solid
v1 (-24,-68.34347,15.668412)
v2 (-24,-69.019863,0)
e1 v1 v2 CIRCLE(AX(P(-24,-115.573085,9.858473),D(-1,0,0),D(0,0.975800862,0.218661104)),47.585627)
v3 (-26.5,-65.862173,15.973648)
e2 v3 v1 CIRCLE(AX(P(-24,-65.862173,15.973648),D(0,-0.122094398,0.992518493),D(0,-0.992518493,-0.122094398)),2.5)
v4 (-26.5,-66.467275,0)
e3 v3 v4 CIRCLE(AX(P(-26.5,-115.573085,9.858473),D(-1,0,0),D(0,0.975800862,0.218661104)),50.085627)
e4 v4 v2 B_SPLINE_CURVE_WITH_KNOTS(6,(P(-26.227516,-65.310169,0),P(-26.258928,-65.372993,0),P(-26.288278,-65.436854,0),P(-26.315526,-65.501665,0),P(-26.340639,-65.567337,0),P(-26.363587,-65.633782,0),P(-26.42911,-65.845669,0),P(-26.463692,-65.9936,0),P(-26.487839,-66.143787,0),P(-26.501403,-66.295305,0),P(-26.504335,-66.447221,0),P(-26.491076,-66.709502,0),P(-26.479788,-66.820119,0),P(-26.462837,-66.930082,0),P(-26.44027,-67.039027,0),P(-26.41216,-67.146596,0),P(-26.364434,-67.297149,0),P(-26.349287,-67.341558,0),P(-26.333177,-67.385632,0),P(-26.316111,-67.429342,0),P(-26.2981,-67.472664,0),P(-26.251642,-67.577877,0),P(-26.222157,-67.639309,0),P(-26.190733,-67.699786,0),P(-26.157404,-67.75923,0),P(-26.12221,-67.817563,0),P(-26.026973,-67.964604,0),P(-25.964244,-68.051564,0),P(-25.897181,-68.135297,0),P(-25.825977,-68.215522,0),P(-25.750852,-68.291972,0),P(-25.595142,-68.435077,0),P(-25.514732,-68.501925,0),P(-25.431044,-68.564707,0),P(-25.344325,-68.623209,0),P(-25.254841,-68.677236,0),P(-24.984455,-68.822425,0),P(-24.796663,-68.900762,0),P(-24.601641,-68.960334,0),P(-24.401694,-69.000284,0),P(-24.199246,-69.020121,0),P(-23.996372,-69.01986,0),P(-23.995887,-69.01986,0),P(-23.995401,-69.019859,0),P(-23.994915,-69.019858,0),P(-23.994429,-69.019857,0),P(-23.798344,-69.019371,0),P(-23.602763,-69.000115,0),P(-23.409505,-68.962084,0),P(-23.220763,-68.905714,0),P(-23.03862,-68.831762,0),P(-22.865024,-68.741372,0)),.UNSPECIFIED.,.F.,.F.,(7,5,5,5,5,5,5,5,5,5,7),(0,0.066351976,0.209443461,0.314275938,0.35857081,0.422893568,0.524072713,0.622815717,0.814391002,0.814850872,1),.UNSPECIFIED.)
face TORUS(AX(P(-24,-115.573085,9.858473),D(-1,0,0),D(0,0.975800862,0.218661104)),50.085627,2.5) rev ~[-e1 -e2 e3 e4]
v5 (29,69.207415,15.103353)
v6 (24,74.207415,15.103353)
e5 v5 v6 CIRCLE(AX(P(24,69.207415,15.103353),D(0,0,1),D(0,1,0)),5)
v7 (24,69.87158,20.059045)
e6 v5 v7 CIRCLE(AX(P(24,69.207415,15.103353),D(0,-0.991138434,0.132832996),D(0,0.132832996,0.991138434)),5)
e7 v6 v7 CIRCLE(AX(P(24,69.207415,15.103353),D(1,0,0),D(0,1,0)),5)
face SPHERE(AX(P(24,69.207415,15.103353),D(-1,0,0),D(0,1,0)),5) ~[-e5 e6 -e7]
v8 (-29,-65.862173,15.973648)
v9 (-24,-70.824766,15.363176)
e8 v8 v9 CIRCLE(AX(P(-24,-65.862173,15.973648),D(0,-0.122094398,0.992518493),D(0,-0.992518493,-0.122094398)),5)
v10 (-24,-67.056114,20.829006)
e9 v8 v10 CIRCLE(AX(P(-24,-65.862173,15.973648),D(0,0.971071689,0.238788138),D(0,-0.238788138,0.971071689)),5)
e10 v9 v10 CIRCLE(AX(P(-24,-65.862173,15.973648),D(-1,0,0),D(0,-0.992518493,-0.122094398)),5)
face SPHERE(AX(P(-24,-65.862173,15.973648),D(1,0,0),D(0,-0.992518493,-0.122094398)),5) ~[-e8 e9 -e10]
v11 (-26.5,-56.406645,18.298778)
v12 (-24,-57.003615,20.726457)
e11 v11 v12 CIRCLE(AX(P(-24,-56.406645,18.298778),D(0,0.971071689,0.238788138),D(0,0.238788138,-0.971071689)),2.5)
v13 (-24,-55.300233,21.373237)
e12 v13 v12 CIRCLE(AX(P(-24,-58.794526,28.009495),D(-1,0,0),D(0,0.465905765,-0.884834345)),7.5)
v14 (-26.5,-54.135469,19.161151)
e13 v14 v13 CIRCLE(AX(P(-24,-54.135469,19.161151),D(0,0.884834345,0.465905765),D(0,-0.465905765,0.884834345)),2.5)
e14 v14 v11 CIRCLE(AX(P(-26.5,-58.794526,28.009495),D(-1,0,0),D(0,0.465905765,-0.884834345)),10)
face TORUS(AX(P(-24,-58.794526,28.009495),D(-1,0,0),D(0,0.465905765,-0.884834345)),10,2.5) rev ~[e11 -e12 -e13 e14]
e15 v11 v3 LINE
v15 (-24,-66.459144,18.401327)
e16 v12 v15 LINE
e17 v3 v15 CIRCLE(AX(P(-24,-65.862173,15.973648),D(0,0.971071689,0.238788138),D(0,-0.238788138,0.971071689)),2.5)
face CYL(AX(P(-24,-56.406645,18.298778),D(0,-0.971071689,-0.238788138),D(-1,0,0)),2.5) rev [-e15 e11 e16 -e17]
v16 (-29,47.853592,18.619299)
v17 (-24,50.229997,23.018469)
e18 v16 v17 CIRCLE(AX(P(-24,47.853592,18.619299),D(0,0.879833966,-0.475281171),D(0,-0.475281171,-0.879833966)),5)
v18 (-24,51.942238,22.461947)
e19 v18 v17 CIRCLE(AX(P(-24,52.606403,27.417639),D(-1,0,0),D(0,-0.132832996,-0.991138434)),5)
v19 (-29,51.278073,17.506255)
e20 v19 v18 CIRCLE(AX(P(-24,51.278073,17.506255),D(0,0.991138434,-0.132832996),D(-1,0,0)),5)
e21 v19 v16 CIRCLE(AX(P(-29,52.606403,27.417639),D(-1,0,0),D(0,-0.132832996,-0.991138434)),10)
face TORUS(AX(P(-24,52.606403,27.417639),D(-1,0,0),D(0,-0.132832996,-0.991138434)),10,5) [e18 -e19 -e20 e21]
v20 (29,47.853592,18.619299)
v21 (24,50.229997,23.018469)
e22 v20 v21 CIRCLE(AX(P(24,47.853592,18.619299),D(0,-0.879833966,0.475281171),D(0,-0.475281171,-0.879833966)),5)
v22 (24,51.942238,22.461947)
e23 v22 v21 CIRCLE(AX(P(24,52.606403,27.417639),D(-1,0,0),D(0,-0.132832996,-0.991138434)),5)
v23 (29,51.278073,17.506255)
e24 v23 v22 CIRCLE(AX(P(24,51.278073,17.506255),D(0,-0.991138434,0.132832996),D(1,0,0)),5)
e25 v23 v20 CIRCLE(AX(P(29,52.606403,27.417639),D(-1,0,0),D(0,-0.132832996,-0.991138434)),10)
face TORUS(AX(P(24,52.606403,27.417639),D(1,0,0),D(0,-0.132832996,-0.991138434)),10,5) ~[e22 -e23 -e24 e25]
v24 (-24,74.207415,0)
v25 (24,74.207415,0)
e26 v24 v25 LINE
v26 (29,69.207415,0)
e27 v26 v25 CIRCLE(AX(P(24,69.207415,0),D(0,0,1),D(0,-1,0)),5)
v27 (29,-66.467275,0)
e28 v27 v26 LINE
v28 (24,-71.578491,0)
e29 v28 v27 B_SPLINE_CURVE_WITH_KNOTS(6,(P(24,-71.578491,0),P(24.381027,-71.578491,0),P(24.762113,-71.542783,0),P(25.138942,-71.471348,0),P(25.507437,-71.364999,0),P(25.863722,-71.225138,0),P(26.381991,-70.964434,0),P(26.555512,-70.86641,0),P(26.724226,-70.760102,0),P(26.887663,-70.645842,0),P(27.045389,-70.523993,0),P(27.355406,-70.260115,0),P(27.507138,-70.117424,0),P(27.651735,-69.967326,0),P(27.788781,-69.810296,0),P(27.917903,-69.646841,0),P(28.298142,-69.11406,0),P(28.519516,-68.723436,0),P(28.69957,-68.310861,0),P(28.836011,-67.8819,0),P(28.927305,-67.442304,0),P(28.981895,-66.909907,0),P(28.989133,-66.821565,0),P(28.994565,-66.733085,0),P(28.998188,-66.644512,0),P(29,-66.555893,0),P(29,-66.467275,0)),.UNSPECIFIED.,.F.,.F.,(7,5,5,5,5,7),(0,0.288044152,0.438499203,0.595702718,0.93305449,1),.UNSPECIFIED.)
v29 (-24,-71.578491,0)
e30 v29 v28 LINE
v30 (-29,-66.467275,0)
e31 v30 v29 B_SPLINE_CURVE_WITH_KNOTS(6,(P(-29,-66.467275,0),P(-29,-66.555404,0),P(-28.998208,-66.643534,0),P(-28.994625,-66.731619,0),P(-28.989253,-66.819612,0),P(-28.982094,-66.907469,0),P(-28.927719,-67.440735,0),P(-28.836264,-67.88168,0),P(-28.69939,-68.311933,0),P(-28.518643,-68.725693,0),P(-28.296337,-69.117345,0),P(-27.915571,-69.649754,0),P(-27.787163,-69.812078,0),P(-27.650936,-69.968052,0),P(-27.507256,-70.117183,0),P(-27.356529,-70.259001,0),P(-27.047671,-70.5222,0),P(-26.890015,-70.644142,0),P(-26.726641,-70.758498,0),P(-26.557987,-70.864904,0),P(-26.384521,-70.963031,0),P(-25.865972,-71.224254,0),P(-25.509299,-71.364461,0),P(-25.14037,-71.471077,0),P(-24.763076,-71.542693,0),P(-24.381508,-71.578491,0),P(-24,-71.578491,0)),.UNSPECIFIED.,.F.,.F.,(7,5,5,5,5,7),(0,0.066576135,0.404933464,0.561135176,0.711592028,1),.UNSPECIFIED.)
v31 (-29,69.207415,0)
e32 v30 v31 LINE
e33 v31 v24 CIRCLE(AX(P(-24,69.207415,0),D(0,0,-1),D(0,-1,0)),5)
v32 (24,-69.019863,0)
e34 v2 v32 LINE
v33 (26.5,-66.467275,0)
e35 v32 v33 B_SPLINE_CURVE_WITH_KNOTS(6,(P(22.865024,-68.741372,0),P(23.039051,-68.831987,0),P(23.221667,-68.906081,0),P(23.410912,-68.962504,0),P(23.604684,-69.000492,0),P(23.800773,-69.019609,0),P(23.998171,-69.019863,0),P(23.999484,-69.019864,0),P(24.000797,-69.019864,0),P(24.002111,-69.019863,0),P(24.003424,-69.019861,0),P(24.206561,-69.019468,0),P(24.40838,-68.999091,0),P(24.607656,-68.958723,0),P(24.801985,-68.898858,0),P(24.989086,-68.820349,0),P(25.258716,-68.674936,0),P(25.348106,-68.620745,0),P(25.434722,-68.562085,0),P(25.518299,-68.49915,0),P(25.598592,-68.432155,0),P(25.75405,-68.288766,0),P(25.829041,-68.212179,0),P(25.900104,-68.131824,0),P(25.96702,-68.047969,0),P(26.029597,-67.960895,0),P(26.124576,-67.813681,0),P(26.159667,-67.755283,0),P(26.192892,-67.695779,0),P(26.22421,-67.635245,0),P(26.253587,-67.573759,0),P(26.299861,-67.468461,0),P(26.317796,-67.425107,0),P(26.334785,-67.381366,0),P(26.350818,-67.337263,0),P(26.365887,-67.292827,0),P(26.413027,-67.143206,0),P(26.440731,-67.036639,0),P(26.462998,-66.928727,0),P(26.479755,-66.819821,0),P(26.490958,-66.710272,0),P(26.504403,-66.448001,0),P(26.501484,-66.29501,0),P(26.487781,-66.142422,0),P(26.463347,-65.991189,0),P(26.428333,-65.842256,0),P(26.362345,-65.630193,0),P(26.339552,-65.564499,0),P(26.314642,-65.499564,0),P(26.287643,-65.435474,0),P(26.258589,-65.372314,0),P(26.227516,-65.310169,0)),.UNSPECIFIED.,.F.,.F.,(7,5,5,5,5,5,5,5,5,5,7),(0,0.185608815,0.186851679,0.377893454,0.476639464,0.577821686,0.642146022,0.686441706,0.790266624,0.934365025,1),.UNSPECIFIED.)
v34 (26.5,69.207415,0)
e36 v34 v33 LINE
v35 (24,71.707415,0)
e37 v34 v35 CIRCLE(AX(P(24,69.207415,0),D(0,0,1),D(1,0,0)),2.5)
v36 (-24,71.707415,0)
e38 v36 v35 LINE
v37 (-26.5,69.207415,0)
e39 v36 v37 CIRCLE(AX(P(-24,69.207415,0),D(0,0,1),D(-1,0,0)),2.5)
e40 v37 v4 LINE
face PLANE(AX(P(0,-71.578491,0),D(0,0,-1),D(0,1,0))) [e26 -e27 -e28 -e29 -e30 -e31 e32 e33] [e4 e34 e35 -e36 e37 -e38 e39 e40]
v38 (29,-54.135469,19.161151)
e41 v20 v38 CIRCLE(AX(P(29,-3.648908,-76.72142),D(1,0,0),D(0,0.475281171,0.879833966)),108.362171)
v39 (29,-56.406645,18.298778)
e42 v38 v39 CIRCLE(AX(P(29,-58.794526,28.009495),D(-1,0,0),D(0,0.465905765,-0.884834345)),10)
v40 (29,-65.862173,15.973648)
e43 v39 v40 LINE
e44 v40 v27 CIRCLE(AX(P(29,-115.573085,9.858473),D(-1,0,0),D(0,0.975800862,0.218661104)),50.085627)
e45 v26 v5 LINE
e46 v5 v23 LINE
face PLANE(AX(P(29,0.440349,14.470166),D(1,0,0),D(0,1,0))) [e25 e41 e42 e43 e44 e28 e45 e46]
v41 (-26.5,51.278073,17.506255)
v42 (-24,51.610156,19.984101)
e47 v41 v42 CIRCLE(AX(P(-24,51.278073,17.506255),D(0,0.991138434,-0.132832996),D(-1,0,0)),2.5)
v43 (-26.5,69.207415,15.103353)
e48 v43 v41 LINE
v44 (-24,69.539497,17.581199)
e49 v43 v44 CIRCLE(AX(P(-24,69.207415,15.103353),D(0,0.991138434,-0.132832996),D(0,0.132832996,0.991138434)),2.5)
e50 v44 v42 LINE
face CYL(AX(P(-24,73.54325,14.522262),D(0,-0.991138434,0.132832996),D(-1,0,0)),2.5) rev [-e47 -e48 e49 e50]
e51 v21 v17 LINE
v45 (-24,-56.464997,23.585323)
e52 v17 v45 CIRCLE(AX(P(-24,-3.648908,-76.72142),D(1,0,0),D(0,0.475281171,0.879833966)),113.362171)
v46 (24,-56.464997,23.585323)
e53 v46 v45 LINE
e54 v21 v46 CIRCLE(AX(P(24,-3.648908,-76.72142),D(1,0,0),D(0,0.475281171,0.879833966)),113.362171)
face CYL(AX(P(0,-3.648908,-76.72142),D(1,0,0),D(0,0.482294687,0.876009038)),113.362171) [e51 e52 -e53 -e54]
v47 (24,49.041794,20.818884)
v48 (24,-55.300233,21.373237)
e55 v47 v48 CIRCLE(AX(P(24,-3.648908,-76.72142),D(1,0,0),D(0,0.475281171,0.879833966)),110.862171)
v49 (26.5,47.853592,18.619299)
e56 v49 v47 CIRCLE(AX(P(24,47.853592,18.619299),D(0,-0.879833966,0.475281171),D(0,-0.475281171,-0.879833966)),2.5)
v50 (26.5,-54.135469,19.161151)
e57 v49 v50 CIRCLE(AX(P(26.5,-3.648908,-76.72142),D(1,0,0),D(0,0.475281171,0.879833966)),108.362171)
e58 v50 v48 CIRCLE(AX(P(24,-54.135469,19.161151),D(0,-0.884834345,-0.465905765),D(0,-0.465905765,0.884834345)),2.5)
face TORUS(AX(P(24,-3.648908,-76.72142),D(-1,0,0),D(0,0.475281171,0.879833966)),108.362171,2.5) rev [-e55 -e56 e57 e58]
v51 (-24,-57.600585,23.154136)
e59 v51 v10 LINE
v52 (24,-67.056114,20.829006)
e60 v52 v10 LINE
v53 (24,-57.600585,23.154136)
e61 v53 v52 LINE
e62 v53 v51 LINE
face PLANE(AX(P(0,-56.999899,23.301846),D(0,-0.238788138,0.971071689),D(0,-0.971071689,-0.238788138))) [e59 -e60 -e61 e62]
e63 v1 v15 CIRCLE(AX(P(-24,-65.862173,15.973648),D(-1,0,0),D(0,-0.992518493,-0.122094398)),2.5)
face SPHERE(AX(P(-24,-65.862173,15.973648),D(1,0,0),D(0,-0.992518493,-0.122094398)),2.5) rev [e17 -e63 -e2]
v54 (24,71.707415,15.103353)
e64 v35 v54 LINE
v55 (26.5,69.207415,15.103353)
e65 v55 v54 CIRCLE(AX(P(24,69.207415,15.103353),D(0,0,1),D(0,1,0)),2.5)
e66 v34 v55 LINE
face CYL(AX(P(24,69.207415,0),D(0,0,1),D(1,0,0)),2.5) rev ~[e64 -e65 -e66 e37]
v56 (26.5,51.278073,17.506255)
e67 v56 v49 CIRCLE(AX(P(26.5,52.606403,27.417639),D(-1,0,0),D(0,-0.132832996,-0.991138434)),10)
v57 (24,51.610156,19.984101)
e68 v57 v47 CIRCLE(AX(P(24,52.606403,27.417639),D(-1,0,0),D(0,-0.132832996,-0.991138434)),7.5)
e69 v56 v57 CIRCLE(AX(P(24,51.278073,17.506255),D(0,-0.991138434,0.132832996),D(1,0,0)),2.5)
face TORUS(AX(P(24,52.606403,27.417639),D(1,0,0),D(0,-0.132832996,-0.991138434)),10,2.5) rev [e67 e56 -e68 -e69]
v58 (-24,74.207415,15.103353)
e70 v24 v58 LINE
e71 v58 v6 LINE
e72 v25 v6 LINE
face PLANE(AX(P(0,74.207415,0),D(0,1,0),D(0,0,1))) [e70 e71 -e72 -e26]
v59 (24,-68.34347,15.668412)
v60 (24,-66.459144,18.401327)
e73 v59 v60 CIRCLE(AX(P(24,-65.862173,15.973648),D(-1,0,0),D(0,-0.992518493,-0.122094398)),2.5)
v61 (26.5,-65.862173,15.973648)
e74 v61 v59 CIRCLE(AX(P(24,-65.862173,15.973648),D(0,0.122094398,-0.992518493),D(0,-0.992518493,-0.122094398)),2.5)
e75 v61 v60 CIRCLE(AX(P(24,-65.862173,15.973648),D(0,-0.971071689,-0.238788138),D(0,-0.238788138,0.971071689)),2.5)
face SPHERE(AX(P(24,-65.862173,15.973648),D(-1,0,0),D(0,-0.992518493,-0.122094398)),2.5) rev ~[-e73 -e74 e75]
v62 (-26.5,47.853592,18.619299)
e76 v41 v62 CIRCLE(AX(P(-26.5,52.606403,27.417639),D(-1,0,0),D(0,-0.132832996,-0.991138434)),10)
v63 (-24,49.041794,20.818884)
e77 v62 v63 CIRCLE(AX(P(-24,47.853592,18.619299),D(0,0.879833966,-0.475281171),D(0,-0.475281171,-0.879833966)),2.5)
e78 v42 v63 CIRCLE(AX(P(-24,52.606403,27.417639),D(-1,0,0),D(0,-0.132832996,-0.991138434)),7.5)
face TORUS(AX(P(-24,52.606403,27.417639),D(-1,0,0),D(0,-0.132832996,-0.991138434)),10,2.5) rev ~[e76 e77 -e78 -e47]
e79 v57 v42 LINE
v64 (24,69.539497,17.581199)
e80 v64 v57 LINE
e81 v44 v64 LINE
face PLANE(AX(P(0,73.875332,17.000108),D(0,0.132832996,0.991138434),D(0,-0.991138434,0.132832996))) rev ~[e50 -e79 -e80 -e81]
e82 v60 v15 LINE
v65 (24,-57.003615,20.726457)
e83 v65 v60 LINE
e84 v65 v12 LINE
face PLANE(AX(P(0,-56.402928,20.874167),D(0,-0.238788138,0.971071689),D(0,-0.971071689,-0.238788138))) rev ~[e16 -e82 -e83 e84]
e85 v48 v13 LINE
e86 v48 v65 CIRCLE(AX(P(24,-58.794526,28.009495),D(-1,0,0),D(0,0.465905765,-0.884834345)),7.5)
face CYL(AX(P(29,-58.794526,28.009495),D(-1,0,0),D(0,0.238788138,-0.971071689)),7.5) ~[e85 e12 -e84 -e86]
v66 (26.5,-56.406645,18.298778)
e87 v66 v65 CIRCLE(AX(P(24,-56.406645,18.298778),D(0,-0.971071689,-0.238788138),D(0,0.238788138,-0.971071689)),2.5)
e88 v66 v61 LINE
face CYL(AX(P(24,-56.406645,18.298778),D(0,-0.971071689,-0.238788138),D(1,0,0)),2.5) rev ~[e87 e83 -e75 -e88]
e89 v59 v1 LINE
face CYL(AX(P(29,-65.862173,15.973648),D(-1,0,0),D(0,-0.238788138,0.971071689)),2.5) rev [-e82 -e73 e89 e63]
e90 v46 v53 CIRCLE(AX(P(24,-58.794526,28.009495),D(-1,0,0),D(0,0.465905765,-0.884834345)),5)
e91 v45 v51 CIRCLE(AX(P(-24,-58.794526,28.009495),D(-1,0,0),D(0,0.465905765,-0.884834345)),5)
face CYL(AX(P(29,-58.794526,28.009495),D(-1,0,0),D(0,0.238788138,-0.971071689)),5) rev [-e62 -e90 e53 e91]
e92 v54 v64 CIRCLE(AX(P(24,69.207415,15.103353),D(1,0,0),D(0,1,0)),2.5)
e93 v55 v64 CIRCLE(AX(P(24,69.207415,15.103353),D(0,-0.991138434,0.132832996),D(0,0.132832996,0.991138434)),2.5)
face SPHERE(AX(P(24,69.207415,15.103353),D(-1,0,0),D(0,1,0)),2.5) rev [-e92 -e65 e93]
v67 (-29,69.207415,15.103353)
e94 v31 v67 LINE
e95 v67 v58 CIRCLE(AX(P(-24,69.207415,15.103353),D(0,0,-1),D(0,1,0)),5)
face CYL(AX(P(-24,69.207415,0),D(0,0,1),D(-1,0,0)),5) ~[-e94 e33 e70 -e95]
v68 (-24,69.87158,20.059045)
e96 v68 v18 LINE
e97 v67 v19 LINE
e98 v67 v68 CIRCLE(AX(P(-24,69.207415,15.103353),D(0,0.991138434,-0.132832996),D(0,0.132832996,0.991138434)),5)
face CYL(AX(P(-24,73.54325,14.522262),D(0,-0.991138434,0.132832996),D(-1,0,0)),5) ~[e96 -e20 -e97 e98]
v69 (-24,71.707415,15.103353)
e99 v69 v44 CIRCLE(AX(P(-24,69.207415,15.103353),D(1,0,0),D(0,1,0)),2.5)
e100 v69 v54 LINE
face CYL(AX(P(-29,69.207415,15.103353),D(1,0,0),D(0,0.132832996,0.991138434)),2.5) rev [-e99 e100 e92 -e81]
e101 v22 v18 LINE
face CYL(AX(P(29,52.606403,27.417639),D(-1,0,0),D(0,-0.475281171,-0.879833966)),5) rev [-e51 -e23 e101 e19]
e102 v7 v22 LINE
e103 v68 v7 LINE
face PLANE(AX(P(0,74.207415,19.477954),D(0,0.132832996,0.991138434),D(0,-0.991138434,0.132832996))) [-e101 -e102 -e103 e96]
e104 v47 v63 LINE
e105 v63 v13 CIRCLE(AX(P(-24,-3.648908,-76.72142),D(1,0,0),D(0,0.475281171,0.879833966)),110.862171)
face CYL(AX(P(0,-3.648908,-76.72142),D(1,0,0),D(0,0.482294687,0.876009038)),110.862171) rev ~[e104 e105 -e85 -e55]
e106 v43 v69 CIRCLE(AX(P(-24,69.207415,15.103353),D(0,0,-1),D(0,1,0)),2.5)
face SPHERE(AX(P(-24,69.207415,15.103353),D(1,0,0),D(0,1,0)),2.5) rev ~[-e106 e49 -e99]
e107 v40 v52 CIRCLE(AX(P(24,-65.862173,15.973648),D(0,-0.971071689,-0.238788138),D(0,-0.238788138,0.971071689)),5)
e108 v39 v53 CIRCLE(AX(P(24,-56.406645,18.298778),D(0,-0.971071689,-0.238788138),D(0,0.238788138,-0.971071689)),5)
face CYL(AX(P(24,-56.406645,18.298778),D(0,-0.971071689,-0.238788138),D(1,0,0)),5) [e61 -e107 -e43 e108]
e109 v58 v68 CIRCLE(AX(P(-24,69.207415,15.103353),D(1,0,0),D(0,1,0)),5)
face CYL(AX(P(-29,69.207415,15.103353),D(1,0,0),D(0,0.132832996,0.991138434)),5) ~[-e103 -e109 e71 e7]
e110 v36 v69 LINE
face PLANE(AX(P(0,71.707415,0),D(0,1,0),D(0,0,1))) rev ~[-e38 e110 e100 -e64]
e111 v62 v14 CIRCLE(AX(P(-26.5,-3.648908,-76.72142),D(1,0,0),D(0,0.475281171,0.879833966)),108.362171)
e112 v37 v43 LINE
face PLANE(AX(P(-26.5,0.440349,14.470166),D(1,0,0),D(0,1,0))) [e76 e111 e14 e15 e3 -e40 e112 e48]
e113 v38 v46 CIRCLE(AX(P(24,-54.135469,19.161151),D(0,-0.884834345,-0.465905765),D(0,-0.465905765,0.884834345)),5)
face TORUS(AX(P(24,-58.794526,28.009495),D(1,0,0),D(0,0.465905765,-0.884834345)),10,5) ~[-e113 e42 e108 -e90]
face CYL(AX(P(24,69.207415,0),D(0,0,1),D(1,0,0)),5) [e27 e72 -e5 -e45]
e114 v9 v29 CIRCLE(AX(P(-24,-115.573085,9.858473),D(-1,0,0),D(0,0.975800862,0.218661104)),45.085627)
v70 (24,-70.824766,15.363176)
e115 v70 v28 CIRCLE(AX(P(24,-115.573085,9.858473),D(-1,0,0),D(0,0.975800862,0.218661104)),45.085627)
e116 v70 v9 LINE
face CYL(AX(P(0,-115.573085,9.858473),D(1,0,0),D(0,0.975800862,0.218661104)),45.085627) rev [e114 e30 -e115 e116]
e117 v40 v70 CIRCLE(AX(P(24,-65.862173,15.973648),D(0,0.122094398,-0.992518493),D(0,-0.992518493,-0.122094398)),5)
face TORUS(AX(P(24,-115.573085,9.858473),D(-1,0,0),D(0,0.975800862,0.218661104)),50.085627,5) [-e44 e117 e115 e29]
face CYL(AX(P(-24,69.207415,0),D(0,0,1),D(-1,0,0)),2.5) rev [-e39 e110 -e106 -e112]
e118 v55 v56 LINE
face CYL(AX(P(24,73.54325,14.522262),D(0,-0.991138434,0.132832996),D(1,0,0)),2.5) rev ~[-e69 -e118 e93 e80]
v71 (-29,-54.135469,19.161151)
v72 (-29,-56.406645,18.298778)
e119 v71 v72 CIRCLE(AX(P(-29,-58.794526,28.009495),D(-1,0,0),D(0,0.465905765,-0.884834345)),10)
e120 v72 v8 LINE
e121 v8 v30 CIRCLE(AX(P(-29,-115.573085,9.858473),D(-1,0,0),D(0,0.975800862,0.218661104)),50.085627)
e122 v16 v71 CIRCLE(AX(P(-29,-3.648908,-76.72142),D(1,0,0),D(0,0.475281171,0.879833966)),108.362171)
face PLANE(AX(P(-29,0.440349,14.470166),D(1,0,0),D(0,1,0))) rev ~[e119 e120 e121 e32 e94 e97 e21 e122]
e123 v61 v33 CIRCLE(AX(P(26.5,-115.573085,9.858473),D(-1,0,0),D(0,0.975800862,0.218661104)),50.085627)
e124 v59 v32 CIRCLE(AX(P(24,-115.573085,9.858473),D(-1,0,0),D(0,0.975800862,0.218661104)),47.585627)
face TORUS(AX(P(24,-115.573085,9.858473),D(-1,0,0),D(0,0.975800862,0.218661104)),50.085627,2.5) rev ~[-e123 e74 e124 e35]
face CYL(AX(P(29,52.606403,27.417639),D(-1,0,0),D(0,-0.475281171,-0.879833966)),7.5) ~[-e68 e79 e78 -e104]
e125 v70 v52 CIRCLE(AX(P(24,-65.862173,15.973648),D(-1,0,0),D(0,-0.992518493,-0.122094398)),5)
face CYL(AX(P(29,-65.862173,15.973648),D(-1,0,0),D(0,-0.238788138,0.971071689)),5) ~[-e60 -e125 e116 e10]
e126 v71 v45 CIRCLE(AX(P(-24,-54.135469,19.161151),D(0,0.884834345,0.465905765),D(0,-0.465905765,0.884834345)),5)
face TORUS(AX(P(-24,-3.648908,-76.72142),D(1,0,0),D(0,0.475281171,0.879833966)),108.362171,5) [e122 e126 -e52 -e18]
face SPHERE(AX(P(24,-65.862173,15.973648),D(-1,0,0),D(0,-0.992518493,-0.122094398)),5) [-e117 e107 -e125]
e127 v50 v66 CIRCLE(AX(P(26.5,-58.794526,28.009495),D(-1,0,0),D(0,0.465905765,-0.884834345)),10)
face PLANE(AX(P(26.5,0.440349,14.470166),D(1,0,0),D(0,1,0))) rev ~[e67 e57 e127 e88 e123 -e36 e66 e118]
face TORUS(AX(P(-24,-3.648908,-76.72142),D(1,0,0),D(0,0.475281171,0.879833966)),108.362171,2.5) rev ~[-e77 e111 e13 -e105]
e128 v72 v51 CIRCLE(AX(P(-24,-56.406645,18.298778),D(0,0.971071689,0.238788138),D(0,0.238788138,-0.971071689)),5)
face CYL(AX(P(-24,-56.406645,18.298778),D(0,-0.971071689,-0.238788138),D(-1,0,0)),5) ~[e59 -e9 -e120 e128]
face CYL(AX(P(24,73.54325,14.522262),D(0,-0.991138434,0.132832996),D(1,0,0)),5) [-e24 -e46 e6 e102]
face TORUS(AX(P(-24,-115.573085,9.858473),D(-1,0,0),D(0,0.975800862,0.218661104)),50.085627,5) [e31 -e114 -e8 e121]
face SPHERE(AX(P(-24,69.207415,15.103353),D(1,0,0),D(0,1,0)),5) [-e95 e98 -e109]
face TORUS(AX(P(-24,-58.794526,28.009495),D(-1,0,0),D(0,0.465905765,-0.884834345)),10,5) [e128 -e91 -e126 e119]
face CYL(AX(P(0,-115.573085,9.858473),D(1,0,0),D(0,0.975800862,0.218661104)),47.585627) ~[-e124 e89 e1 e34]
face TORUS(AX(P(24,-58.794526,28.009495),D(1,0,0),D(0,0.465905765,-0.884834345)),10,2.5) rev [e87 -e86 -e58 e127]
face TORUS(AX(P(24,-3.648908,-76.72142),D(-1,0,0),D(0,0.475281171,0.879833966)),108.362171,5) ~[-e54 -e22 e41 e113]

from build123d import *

# Parameters (mm, degrees)
F1_DEPTH = 29
F2_F1_R  = 5
F2_F2_R  = 5
F3_T     = -2.5


with BuildPart() as f1:
    # F0 (on Right) → F1 (new body, symmetric)
    with BuildSketch(Plane.YZ):
        with BuildLine():
            ThreePointArc((-71.5784906799, 19.7169460854), (-70.4874573475, 9.8584730427), (-71.5784906799, 0))
            Line((-71.5784906799, 0), (-54.9704477794, 0))
            ThreePointArc((-54.9704477794, 0), (-43.1382882132, 14), (-31.306128647, 0))
            Line((-31.306128647, 0), (16.2495522206, 0))
            ThreePointArc((16.2495522206, 0), (28.0817117868, 14), (39.913871353, 0))
            Line((39.913871353, 0), (74.2074146826, 0))
            Line((74.2074146826, 0), (74.2074146826, 19.4779538288))
            Line((74.2074146826, 19.4779538288), (51.0250648113, 22.5848669347))
            ThreePointArc((51.0250648113, 22.5848669347), (-2.8965217341, 36.6382547678), (-56.9998987666, 23.3018459996))
            Line((-56.9998987666, 23.3018459996), (-71.5784906799, 19.7169460854))
        make_face()
        with BuildLine():
            ThreePointArc((-31.306128647, 0), (-43.1382882132, 14), (-54.9704477794, 0))
            Line((-54.9704477794, 0), (-31.306128647, 0))
        make_face()
        with BuildLine():
            ThreePointArc((39.913871353, 0), (28.0817117868, 14), (16.2495522206, 0))
            Line((16.2495522206, 0), (39.913871353, 0))
        make_face()
    extrude(amount=F1_DEPTH, both=True)

    # F2: fillet of radius 5 on 10 edges, made by hand

    # F2_f1
    f2_f1_edges = [f1.edges().sort_by_distance(p)[0] for p in [
        (0, -56.9998987666, 23.3018459996),
        (0, 51.0250648113, 22.5848669347),
    ]]
    fillet(f2_f1_edges, radius=F2_F1_R)

    # F2_f2
    f2_f2_edges = [f1.edges().sort_by_distance(p)[0] for p in [
        (0, -71.5784906799, 19.7169460854),
        (-29, -70.4874573475, 9.8584730427),
        (29, -70.4874573475, 9.8584730427),
        (-29, -3.0466412139, 36.6391517316),
        (29, -3.0466412139, 36.6391517316),
        (0, 74.2074146826, 19.4779538288),
        (29, 74.2074146826, 9.7389769144),
        (-29, 74.2074146826, 9.7389769144),
        (29, 51.0608622621, 22.6625045572),
        (29, -57.0196487491, 23.3351165373),
        (-29, 51.0608622621, 22.6625045572),
        (-29, -57.0196487491, 23.3351165373),
    ]]
    fillet(f2_f2_edges, radius=F2_F2_R)

    # F3
    f3_openings = [f1.faces().sort_by_distance(p)[0] for p in [
        (0, 1.316584, 0),
    ]]
    offset(amount=F3_T, openings=f3_openings, kind=Kind.INTERSECTION)


solid = f1.part
